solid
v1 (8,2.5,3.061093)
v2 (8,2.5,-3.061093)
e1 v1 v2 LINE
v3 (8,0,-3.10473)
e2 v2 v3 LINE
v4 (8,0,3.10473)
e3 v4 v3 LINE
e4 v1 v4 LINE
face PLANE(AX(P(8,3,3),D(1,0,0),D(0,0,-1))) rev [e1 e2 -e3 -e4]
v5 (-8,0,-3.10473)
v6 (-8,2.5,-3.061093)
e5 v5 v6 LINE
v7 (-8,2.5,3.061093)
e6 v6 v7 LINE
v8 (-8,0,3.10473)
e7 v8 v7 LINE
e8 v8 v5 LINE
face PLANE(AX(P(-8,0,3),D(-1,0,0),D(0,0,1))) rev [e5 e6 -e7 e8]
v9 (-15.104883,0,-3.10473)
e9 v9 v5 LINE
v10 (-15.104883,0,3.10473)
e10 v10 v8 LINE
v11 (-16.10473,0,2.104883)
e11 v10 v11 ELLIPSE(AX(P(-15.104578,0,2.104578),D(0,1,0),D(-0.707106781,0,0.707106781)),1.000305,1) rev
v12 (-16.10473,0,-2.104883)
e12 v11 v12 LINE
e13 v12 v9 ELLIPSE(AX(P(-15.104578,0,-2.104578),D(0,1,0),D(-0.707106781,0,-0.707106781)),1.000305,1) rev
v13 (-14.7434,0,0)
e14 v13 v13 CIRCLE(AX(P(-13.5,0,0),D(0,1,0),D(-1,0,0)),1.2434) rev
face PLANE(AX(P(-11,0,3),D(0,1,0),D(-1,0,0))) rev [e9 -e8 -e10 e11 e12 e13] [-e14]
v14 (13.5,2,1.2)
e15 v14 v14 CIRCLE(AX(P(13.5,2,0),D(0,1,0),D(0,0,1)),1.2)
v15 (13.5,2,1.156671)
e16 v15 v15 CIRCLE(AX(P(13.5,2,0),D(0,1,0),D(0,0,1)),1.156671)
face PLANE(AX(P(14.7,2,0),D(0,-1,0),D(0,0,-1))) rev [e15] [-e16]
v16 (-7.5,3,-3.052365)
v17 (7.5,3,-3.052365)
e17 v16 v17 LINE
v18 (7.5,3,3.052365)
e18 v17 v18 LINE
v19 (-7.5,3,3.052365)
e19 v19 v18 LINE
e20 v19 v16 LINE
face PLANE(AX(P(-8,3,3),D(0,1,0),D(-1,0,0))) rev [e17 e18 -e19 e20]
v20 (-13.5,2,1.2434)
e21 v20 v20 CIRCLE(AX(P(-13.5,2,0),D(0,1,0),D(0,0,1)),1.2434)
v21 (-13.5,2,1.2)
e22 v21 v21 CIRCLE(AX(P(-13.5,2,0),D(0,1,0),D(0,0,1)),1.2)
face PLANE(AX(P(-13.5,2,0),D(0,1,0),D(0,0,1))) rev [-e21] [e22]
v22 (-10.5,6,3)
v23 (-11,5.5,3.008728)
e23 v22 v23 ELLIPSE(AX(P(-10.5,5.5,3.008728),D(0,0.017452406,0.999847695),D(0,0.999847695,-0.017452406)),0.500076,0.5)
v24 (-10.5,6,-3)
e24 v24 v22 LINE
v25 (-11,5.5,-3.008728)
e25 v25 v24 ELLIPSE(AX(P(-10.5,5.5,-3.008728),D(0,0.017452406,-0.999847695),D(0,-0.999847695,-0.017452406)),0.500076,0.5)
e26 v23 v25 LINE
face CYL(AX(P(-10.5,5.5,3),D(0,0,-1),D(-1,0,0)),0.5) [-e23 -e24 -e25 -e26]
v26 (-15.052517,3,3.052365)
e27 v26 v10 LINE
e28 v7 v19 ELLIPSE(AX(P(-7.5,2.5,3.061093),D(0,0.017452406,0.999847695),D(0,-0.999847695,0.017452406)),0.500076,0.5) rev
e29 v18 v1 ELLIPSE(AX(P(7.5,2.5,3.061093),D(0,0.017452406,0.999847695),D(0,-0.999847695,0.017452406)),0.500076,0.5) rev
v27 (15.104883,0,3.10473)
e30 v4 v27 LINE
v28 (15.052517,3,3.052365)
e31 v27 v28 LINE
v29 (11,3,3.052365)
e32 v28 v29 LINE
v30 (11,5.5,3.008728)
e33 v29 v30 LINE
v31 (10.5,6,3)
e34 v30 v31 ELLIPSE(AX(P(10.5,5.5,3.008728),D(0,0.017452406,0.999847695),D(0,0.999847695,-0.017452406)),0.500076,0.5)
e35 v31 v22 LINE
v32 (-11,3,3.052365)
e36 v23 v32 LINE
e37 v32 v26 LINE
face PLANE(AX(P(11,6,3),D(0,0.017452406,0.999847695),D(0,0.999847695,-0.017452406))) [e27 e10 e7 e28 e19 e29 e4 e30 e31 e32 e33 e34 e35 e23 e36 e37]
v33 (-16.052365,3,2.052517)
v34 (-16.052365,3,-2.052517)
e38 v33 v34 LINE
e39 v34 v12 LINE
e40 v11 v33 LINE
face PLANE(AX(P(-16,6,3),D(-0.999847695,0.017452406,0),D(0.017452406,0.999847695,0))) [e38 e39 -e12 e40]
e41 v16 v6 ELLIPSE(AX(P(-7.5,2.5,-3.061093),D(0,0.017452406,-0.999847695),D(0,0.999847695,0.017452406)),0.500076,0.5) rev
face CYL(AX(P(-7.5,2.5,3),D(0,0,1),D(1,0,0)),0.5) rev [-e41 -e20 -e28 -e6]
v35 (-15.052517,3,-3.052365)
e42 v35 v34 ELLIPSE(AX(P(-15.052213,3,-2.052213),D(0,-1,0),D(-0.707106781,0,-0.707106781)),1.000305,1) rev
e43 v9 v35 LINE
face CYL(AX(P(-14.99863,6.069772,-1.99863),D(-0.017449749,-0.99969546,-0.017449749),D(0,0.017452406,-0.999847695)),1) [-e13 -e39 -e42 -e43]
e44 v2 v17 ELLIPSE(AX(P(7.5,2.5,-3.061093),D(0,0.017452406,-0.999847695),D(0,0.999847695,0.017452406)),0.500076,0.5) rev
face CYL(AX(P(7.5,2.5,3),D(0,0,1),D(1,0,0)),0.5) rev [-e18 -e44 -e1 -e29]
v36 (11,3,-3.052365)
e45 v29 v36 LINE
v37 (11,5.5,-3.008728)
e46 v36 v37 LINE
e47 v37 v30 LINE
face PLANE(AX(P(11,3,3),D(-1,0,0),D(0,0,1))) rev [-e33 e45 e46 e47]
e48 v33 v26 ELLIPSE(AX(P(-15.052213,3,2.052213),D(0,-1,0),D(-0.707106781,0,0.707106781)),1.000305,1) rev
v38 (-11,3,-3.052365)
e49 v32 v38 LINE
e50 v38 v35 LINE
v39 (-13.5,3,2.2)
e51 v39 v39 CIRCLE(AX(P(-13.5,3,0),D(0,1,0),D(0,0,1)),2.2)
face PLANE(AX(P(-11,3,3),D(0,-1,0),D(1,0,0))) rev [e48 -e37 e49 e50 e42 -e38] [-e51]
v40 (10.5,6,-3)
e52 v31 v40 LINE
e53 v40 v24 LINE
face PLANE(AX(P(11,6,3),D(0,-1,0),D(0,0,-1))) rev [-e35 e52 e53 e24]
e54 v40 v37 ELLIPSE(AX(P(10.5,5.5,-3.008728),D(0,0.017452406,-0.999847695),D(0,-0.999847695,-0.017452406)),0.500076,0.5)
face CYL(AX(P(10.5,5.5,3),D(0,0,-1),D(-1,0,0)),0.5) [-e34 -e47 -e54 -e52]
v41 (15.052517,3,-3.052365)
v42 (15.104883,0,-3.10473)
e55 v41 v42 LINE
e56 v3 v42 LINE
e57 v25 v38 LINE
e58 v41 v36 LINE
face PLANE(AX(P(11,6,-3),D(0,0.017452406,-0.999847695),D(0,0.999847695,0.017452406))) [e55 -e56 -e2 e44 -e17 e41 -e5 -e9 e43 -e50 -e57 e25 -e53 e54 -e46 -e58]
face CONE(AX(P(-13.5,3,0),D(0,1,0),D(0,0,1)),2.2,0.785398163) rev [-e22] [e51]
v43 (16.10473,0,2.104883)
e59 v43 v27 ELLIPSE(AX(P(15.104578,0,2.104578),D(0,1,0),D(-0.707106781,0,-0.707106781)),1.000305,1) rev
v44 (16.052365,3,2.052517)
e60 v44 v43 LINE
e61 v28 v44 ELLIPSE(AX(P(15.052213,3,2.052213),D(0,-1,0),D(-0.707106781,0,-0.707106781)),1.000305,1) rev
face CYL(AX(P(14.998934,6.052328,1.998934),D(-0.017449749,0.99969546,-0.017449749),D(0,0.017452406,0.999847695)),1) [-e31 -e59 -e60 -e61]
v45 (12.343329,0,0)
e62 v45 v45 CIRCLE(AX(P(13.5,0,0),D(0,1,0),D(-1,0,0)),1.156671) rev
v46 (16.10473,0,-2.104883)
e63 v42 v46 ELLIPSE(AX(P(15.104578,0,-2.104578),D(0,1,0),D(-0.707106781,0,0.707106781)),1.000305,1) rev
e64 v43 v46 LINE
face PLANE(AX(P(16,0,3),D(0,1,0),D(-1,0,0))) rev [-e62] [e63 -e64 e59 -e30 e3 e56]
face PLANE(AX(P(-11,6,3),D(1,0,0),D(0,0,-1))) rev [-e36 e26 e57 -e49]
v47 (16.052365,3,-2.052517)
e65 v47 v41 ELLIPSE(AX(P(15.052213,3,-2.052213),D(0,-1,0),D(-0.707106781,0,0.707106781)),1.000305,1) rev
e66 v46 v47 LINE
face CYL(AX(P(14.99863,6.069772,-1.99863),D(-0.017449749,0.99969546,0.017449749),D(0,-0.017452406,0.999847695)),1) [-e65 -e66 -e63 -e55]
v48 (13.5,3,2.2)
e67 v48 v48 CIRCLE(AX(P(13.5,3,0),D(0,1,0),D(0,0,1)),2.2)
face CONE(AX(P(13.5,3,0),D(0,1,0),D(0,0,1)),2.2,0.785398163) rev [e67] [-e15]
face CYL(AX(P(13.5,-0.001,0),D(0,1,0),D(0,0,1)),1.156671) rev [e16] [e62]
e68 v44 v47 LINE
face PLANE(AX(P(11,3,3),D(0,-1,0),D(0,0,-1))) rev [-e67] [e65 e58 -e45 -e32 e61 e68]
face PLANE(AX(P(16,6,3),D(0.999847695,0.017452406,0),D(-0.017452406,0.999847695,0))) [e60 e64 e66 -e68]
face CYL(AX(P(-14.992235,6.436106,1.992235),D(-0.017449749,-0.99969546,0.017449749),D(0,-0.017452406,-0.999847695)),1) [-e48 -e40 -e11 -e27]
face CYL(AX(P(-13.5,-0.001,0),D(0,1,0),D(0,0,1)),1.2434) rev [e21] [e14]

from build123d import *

# Parameters (mm, degrees)
SALIENTE_EXTRUIR1_DEPTH      = 3
TALADROAVANZADO1_OUTLINE_R   = 1.2
TALADROAVANZADO1_DEPTH       = 1
TALADROAVANZADO1_DRAFT       = -45
TALADROAVANZADO1_2_OUTLINE_R = 1.2
TALADROAVANZADO1_2_DEPTH     = 1
TALADROAVANZADO1_2_DRAFT     = -45
CORTAR_EXTRUIR1_REACH        = 18.763
CROQUIS3_R                   = 1.243399974
CROQUIS3_R_2                 = 1.156671482
REDONDEO1_R                  = 0.5
REDONDEO2_R                  = 0.5
NGULO_DE_SALIDA1_ANGLE       = 1
REDONDEO3_R                  = 1


# Read off the part's stored shape, not the designer's step: TaladroAvanzado1
with BuildPart() as part:
    # Croquis1 → Saliente-Extruir1 (new, symmetric)
    with BuildSketch(Plane.XY):
        Polygon((-11, 0), (-8, 0), (-8, 3), (8, 3), (8, 0), (11, 0), (16, 0), (16, 3), (11, 3), (11, 6), (-11, 6), (-11, 3), (-16, 3), (-16, 0), align=None)
    extrude(amount=SALIENTE_EXTRUIR1_DEPTH, both=True)


with BuildPart() as taladroavanzado1_tool:
    # TaladroAvanzado1 outline → TaladroAvanzado1 (with draft: the straight prism first)
    with BuildSketch(Plane(origin=(0, 2, 0), x_dir=(1, 0, 0), z_dir=(0, 1, 0))):
        with Locations((13.5, 0)):
            Circle(TALADROAVANZADO1_OUTLINE_R)
    extrude(amount=TALADROAVANZADO1_DEPTH)
    # TaladroAvanzado1: the draft: its side faces are tilted about the plane it starts from
    taladroavanzado1_sides = [taladroavanzado1_tool.faces().sort_by_distance(p)[0] for p in [
        (12.3, 2.5, 0),
    ]]
    draft(taladroavanzado1_sides, Plane(origin=(0, 2, 0), x_dir=(1, 0, 0), z_dir=(0, 1, 0)), TALADROAVANZADO1_DRAFT)


with BuildPart() as part_1:
    add(part.part)

    # TaladroAvanzado1: cut by taladroavanzado1_tool
    add(taladroavanzado1_tool.part, mode=Mode.SUBTRACT)


with BuildPart() as taladroavanzado1_2_tool:
    # TaladroAvanzado1 2 outline → TaladroAvanzado1 2 (with draft: the straight prism first)
    with BuildSketch(Plane(origin=(0, 2, 0), x_dir=(1, 0, 0), z_dir=(0, 1, 0))):
        with Locations((-13.5, 0)):
            Circle(TALADROAVANZADO1_2_OUTLINE_R)
    extrude(amount=TALADROAVANZADO1_2_DEPTH)
    # TaladroAvanzado1 2: the draft: its side faces are tilted about the plane it starts from
    taladroavanzado1_2_sides = [taladroavanzado1_2_tool.faces().sort_by_distance(p)[0] for p in [
        (-14.7, 2.5, 0),
    ]]
    draft(taladroavanzado1_2_sides, Plane(origin=(0, 2, 0), x_dir=(1, 0, 0), z_dir=(0, 1, 0)), TALADROAVANZADO1_2_DRAFT)


with BuildPart() as part_2:
    add(part_1.part)

    # TaladroAvanzado1 2: cut by taladroavanzado1_2_tool
    add(taladroavanzado1_2_tool.part, mode=Mode.SUBTRACT)

    # Croquis3 → Cortar-Extruir1 (cut, up to next)
    with BuildSketch(Plane(origin=(0, 2, 0), x_dir=(1, 0, 0), z_dir=(0, 1, 0)), mode=Mode.PRIVATE) as cortar_extruir1_sk1:
        with Locations(Location((-13.5, 0, 0), (0, 0, 270))):
            Circle(CROQUIS3_R)
    cortar_extruir1_tool1 = extrude(cortar_extruir1_sk1.sketch, amount=-CORTAR_EXTRUIR1_REACH, mode=Mode.PRIVATE) & part_2.part
    # Croquis3 → Cortar-Extruir1 (cut, up to next)
    with BuildSketch(Plane(origin=(0, 2, 0), x_dir=(1, 0, 0), z_dir=(0, 1, 0)), mode=Mode.PRIVATE) as cortar_extruir1_sk2:
        with Locations(Location((13.5, 0, 0), (0, 0, 270))):
            Circle(CROQUIS3_R_2)
    cortar_extruir1_tool2 = extrude(cortar_extruir1_sk2.sketch, amount=-CORTAR_EXTRUIR1_REACH, mode=Mode.PRIVATE) & part_2.part
    add(cortar_extruir1_tool1.solids().sort_by_distance((-13.5, 2, 0))[0], mode=Mode.SUBTRACT)
    add(cortar_extruir1_tool2.solids().sort_by_distance((13.5, 2, 0))[0], mode=Mode.SUBTRACT)

    # Redondeo1
    redondeo1_edges = [part_2.edges().sort_by_distance(p)[0] for p in [
        (8, 3, 0),
        (-8, 3, 0),
    ]]
    fillet(redondeo1_edges, radius=REDONDEO1_R)

    # Redondeo2
    redondeo2_edges = [part_2.edges().sort_by_distance(p)[0] for p in [
        (-11, 6, 0),
        (11, 6, 0),
    ]]
    fillet(redondeo2_edges, radius=REDONDEO2_R)

    # Ángulo de salida1
    ngulo_de_salida1_faces = [part_2.faces().sort_by_distance(p)[0] for p in [
        (0, 3.234018397, 3),
        (0, 3.234018397, -3),
        (16, 1.5, 0),
        (-16, 1.5, 0),
    ]]
    draft(ngulo_de_salida1_faces, Plane(origin=(11, 6, 3), x_dir=(0, 0, 1), z_dir=(0, 1, 0)), NGULO_DE_SALIDA1_ANGLE)

    # Redondeo3
    redondeo3_edges = [part_2.edges().sort_by_distance(p)[0] for p in [
        (-16.078547792, 1.5, -3.078547792),
        (16.078547792, 1.5, -3.078547792),
        (16.078547792, 1.5, 3.078547792),
        (-16.078547792, 1.5, 3.078547792),
    ]]
    fillet(redondeo3_edges, radius=REDONDEO3_R)


solid = part_2.part
